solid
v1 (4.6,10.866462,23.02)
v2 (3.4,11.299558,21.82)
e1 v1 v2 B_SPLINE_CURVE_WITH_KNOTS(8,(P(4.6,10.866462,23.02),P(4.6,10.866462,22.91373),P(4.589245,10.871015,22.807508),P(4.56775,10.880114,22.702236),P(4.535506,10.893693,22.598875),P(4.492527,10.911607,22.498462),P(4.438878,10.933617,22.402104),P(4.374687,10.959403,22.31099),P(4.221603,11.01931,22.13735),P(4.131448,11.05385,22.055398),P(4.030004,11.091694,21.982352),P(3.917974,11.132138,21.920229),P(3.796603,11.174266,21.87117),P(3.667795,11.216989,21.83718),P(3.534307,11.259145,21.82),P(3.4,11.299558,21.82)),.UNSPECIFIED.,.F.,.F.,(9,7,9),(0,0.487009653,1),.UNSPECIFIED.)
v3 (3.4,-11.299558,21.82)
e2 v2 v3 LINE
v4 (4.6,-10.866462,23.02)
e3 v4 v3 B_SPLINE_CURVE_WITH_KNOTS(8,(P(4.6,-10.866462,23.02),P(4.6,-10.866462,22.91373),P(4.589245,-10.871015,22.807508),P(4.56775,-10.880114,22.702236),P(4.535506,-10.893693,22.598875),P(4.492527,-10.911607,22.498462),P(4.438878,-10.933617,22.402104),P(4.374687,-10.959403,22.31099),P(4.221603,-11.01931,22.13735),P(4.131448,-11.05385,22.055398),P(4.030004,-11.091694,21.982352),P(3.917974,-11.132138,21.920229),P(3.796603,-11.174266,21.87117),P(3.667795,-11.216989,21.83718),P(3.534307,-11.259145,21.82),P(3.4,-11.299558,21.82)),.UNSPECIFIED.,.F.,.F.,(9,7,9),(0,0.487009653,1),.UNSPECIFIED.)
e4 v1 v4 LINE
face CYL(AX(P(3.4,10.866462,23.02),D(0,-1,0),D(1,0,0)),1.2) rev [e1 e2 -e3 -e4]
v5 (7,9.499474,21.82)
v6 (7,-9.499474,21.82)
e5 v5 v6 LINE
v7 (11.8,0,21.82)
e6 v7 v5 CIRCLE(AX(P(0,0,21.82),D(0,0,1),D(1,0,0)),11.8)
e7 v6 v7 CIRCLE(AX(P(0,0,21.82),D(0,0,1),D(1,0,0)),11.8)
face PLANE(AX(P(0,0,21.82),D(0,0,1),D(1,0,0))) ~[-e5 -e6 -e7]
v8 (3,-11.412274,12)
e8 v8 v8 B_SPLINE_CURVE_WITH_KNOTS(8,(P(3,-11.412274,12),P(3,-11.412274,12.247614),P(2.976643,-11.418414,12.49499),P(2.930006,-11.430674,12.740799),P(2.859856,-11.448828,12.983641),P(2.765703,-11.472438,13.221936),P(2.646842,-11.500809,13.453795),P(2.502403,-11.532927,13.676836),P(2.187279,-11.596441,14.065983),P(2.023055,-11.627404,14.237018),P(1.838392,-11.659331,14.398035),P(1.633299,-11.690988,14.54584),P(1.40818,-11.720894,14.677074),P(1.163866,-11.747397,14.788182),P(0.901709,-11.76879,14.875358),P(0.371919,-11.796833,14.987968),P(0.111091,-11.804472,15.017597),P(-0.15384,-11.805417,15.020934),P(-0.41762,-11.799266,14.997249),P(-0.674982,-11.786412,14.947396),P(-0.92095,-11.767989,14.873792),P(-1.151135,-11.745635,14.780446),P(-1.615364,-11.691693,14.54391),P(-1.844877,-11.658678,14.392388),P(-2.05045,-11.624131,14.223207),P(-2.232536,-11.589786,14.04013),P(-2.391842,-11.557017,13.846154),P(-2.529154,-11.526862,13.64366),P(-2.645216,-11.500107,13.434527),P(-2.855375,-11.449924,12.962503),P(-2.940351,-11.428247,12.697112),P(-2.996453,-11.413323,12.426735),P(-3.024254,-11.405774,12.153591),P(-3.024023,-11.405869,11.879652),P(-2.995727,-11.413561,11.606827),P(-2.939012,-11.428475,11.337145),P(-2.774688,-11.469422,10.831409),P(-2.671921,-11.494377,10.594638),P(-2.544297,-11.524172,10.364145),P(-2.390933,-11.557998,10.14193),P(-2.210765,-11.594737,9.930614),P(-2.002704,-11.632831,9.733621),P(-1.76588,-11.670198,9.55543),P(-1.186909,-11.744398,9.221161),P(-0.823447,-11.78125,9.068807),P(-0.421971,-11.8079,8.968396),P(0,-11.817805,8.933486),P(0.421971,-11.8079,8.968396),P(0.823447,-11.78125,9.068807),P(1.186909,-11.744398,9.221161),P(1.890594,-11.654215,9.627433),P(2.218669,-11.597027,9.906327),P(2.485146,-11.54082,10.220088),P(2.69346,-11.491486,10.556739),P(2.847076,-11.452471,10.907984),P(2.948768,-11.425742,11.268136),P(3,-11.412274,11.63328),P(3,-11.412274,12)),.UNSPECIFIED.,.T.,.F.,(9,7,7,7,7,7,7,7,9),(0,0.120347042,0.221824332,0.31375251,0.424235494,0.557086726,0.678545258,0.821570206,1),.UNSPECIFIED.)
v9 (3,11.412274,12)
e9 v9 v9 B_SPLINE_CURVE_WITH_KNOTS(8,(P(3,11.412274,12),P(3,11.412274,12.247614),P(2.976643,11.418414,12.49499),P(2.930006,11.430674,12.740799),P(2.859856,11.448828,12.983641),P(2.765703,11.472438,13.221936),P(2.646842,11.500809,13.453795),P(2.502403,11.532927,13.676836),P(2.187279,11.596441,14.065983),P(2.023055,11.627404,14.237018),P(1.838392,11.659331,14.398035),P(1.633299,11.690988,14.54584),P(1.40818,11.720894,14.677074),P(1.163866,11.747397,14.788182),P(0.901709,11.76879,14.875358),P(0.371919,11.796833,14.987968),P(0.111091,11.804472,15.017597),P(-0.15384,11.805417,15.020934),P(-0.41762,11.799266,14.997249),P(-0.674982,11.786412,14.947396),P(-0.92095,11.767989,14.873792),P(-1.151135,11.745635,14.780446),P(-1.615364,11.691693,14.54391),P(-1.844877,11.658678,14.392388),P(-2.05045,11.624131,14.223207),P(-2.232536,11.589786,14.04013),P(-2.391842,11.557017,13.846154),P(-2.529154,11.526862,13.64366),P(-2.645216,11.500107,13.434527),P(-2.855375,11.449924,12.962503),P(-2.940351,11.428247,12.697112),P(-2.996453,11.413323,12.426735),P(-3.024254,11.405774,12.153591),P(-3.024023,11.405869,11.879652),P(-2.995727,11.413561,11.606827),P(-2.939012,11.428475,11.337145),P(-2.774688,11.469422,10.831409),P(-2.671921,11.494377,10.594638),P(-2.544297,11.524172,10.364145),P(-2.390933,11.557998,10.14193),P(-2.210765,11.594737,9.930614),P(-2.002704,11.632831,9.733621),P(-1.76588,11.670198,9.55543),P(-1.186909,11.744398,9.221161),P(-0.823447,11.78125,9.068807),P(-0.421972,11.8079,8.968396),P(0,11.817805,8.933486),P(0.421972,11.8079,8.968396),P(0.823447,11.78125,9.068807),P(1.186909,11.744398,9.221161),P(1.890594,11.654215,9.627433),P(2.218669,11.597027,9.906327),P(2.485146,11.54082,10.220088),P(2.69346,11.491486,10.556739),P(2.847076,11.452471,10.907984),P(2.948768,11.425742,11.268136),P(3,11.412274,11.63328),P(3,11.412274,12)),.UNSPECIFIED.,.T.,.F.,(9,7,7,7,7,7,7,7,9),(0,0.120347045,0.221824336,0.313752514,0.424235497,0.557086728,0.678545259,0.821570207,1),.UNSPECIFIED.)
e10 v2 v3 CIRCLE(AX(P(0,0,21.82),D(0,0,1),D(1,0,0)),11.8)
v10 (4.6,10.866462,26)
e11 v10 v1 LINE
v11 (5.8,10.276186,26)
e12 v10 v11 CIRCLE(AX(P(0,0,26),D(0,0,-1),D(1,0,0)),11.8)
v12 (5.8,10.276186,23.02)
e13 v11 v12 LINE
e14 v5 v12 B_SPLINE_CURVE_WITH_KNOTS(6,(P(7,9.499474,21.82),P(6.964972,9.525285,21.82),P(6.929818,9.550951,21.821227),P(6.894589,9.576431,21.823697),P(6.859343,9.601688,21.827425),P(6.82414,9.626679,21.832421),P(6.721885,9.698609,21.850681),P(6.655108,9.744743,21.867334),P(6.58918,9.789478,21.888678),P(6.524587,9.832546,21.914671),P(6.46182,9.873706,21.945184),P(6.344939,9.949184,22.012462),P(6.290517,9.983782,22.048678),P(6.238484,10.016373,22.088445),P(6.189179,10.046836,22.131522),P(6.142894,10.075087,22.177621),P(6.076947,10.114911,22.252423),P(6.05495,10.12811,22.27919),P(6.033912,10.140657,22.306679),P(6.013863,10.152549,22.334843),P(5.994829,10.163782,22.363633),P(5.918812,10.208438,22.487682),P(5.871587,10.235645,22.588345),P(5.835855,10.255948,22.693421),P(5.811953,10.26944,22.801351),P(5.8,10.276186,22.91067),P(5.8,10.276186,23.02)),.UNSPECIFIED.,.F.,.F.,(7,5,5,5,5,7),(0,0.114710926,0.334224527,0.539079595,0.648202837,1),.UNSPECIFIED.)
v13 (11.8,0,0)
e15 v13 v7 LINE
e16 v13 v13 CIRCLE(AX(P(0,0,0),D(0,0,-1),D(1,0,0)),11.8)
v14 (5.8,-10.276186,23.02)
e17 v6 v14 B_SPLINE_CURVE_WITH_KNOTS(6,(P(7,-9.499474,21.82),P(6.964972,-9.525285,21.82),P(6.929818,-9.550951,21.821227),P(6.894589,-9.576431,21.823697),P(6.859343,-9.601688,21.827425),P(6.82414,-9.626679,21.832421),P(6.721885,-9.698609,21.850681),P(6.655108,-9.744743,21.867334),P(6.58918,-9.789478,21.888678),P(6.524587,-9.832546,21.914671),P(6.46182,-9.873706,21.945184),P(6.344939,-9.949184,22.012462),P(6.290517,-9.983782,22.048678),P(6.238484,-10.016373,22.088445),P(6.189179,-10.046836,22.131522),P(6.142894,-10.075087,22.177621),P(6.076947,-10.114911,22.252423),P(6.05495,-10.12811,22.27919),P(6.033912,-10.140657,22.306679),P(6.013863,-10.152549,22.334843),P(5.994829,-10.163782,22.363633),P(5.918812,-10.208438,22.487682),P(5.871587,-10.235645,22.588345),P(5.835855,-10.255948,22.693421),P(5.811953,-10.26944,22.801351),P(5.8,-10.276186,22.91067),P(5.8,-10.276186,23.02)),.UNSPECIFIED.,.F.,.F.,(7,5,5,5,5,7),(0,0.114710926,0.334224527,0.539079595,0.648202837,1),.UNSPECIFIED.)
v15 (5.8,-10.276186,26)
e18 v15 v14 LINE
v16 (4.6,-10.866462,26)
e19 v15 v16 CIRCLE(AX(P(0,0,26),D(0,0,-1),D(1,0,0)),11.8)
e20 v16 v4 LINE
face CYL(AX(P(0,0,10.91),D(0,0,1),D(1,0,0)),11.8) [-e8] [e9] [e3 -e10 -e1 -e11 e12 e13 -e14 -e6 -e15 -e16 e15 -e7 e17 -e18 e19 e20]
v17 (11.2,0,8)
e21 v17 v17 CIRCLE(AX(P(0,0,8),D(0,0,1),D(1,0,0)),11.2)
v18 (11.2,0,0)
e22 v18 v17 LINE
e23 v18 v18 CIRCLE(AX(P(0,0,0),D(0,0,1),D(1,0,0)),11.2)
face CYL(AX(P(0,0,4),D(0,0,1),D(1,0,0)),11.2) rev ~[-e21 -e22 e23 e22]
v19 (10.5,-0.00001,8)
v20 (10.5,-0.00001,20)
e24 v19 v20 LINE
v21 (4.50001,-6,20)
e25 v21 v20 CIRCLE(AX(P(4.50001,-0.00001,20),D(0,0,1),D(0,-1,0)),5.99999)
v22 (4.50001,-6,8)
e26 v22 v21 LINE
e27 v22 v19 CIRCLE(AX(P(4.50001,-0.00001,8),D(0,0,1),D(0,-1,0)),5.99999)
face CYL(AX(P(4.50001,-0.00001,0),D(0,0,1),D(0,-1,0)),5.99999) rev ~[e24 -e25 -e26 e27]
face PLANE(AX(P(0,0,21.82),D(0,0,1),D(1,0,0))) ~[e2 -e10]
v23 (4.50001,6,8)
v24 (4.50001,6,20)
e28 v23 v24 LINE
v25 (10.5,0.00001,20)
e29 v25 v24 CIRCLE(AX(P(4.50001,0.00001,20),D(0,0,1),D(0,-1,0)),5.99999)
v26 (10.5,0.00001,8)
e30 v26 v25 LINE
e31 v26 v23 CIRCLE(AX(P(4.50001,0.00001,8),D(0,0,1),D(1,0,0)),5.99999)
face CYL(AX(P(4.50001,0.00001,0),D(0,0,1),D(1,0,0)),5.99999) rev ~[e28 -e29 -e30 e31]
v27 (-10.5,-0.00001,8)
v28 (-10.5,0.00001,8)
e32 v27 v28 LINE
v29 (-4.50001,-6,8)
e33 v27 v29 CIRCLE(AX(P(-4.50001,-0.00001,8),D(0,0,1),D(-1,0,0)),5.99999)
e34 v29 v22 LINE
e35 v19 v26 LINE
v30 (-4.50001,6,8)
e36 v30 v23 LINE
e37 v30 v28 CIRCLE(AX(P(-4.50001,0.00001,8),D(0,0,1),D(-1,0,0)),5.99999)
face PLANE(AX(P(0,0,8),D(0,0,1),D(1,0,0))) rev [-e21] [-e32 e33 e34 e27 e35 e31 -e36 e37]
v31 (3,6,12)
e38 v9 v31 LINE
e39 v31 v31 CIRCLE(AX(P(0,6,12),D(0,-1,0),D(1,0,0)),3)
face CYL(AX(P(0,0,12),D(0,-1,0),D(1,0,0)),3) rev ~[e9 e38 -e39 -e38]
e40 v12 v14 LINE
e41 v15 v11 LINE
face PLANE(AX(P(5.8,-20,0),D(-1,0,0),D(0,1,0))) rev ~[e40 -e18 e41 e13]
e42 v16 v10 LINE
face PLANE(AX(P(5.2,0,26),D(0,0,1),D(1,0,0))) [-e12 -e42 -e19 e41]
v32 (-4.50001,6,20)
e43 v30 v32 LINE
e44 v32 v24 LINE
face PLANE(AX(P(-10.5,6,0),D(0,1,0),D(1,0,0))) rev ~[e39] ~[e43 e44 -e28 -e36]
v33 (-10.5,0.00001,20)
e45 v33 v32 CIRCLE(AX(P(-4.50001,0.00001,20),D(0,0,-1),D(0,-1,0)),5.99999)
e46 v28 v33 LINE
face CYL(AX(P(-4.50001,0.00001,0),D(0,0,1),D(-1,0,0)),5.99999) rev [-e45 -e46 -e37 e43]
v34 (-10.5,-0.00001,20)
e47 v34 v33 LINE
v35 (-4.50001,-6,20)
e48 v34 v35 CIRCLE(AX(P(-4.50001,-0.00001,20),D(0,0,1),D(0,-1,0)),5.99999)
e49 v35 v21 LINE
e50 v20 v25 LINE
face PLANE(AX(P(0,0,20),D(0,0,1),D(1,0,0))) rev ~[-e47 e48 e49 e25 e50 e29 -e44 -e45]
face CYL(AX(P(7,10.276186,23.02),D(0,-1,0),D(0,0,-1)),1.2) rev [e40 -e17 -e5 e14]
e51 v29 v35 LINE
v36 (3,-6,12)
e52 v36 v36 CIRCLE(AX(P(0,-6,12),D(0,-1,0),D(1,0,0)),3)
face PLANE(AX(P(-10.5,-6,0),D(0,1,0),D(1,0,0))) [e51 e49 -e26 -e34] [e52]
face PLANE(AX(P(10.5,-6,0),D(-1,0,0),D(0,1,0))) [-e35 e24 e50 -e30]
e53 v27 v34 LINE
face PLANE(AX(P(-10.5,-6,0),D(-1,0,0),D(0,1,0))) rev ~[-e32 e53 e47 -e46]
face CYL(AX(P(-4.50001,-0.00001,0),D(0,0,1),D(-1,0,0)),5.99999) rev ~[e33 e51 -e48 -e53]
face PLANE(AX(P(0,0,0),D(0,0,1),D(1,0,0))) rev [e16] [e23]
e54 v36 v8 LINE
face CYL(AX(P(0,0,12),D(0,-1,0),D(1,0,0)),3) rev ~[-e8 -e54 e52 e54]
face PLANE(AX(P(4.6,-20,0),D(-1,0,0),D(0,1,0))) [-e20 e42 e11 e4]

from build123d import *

# Parameters (mm, degrees)
F0_W      = 11.8
F0_H      = 21.82
F3_W      = 1.2
F3_H      = 40
F4_DEPTH  = 26
F5_R      = 11.8
F6_DEPTH  = 30
F2_W      = 11.2
F2_H      = 8
F9_W      = 21
F9_H      = 12
F10_DEPTH = 20
F11_R     = 5.99999
F13_R     = 1.2
F14_R     = 3
F15_DEPTH = 12.5


# Not quite as in the source:
# - a fillet or chamfer is up to 0.001 mm smaller than in the source, because OpenCascade refuses the exact size


with BuildPart() as f1:
    # F0 (on Front) → F1 (revolve)
    with BuildSketch(Plane.XZ):
        with Locations((5.9, 10.91)):
            Rectangle(F0_W, F0_H)
    revolve(axis=Axis((0, 0, 10.91), (0, 0, 1)))


with BuildPart() as f4:
    # F3 (on Top) → F4 (new body)
    with BuildSketch(Plane.XY):
        with Locations((5.2, 0)):
            Rectangle(F3_W, F3_H)
    extrude(amount=F4_DEPTH)


with BuildPart() as f6_tool:
    # F5 (on Top) → F6 (new body)
    with BuildSketch(Plane.XY):
        Circle(F5_R)
    extrude(amount=F6_DEPTH)


with BuildPart() as f1_1:
    add(f1.part)

    # F6: intersect by f6_tool
    add(f6_tool.part, mode=Mode.INTERSECT)


with BuildPart() as f4_1:
    add(f4.part)

    # F6: intersect by f6_tool
    add(f6_tool.part, mode=Mode.INTERSECT)

    # F7: union F1
    add(f1_1.part)

    # F2 (on Front) → F8 (revolve, cut)
    with BuildSketch(Plane.XZ):
        with Locations((5.6, 4)):
            Rectangle(F2_W, F2_H)
    revolve(axis=Axis((0, 0, 4), (0, 0, 1)), mode=Mode.SUBTRACT)


with BuildPart() as f10:
    # F9 (on Top) → F10 (new body)
    with BuildSketch(Plane.XY):
        Rectangle(F9_W, F9_H)
    extrude(amount=F10_DEPTH)

    # F11 (radius 6 in the source; OpenCascade refuses exactly that, so slightly less here)
    f11_edges = [f10.edges().sort_by_distance(p)[0] for p in [
        (-10.5, -6, 10),
        (10.5, -6, 10),
        (-10.5, 6, 10),
        (10.5, 6, 10),
    ]]
    fillet(f11_edges, radius=F11_R)


with BuildPart() as f4_2:
    add(f4_1.part)

    # F12: cut F10
    add(f10.part, mode=Mode.SUBTRACT)

    # F13
    f13_edges = [f4_2.edges().sort_by_distance(p)[0] for p in [
        (4.6, 0, 21.82),
        (5.8, 0, 21.82),
    ]]
    fillet(f13_edges, radius=F13_R)

    # F14 (on Front) → F15 (cut, symmetric)
    with BuildSketch(Plane.XZ):
        with Locations((0, 12)):
            Circle(F14_R)
    extrude(amount=F15_DEPTH, both=True, mode=Mode.SUBTRACT)


solid = f4_2.part
